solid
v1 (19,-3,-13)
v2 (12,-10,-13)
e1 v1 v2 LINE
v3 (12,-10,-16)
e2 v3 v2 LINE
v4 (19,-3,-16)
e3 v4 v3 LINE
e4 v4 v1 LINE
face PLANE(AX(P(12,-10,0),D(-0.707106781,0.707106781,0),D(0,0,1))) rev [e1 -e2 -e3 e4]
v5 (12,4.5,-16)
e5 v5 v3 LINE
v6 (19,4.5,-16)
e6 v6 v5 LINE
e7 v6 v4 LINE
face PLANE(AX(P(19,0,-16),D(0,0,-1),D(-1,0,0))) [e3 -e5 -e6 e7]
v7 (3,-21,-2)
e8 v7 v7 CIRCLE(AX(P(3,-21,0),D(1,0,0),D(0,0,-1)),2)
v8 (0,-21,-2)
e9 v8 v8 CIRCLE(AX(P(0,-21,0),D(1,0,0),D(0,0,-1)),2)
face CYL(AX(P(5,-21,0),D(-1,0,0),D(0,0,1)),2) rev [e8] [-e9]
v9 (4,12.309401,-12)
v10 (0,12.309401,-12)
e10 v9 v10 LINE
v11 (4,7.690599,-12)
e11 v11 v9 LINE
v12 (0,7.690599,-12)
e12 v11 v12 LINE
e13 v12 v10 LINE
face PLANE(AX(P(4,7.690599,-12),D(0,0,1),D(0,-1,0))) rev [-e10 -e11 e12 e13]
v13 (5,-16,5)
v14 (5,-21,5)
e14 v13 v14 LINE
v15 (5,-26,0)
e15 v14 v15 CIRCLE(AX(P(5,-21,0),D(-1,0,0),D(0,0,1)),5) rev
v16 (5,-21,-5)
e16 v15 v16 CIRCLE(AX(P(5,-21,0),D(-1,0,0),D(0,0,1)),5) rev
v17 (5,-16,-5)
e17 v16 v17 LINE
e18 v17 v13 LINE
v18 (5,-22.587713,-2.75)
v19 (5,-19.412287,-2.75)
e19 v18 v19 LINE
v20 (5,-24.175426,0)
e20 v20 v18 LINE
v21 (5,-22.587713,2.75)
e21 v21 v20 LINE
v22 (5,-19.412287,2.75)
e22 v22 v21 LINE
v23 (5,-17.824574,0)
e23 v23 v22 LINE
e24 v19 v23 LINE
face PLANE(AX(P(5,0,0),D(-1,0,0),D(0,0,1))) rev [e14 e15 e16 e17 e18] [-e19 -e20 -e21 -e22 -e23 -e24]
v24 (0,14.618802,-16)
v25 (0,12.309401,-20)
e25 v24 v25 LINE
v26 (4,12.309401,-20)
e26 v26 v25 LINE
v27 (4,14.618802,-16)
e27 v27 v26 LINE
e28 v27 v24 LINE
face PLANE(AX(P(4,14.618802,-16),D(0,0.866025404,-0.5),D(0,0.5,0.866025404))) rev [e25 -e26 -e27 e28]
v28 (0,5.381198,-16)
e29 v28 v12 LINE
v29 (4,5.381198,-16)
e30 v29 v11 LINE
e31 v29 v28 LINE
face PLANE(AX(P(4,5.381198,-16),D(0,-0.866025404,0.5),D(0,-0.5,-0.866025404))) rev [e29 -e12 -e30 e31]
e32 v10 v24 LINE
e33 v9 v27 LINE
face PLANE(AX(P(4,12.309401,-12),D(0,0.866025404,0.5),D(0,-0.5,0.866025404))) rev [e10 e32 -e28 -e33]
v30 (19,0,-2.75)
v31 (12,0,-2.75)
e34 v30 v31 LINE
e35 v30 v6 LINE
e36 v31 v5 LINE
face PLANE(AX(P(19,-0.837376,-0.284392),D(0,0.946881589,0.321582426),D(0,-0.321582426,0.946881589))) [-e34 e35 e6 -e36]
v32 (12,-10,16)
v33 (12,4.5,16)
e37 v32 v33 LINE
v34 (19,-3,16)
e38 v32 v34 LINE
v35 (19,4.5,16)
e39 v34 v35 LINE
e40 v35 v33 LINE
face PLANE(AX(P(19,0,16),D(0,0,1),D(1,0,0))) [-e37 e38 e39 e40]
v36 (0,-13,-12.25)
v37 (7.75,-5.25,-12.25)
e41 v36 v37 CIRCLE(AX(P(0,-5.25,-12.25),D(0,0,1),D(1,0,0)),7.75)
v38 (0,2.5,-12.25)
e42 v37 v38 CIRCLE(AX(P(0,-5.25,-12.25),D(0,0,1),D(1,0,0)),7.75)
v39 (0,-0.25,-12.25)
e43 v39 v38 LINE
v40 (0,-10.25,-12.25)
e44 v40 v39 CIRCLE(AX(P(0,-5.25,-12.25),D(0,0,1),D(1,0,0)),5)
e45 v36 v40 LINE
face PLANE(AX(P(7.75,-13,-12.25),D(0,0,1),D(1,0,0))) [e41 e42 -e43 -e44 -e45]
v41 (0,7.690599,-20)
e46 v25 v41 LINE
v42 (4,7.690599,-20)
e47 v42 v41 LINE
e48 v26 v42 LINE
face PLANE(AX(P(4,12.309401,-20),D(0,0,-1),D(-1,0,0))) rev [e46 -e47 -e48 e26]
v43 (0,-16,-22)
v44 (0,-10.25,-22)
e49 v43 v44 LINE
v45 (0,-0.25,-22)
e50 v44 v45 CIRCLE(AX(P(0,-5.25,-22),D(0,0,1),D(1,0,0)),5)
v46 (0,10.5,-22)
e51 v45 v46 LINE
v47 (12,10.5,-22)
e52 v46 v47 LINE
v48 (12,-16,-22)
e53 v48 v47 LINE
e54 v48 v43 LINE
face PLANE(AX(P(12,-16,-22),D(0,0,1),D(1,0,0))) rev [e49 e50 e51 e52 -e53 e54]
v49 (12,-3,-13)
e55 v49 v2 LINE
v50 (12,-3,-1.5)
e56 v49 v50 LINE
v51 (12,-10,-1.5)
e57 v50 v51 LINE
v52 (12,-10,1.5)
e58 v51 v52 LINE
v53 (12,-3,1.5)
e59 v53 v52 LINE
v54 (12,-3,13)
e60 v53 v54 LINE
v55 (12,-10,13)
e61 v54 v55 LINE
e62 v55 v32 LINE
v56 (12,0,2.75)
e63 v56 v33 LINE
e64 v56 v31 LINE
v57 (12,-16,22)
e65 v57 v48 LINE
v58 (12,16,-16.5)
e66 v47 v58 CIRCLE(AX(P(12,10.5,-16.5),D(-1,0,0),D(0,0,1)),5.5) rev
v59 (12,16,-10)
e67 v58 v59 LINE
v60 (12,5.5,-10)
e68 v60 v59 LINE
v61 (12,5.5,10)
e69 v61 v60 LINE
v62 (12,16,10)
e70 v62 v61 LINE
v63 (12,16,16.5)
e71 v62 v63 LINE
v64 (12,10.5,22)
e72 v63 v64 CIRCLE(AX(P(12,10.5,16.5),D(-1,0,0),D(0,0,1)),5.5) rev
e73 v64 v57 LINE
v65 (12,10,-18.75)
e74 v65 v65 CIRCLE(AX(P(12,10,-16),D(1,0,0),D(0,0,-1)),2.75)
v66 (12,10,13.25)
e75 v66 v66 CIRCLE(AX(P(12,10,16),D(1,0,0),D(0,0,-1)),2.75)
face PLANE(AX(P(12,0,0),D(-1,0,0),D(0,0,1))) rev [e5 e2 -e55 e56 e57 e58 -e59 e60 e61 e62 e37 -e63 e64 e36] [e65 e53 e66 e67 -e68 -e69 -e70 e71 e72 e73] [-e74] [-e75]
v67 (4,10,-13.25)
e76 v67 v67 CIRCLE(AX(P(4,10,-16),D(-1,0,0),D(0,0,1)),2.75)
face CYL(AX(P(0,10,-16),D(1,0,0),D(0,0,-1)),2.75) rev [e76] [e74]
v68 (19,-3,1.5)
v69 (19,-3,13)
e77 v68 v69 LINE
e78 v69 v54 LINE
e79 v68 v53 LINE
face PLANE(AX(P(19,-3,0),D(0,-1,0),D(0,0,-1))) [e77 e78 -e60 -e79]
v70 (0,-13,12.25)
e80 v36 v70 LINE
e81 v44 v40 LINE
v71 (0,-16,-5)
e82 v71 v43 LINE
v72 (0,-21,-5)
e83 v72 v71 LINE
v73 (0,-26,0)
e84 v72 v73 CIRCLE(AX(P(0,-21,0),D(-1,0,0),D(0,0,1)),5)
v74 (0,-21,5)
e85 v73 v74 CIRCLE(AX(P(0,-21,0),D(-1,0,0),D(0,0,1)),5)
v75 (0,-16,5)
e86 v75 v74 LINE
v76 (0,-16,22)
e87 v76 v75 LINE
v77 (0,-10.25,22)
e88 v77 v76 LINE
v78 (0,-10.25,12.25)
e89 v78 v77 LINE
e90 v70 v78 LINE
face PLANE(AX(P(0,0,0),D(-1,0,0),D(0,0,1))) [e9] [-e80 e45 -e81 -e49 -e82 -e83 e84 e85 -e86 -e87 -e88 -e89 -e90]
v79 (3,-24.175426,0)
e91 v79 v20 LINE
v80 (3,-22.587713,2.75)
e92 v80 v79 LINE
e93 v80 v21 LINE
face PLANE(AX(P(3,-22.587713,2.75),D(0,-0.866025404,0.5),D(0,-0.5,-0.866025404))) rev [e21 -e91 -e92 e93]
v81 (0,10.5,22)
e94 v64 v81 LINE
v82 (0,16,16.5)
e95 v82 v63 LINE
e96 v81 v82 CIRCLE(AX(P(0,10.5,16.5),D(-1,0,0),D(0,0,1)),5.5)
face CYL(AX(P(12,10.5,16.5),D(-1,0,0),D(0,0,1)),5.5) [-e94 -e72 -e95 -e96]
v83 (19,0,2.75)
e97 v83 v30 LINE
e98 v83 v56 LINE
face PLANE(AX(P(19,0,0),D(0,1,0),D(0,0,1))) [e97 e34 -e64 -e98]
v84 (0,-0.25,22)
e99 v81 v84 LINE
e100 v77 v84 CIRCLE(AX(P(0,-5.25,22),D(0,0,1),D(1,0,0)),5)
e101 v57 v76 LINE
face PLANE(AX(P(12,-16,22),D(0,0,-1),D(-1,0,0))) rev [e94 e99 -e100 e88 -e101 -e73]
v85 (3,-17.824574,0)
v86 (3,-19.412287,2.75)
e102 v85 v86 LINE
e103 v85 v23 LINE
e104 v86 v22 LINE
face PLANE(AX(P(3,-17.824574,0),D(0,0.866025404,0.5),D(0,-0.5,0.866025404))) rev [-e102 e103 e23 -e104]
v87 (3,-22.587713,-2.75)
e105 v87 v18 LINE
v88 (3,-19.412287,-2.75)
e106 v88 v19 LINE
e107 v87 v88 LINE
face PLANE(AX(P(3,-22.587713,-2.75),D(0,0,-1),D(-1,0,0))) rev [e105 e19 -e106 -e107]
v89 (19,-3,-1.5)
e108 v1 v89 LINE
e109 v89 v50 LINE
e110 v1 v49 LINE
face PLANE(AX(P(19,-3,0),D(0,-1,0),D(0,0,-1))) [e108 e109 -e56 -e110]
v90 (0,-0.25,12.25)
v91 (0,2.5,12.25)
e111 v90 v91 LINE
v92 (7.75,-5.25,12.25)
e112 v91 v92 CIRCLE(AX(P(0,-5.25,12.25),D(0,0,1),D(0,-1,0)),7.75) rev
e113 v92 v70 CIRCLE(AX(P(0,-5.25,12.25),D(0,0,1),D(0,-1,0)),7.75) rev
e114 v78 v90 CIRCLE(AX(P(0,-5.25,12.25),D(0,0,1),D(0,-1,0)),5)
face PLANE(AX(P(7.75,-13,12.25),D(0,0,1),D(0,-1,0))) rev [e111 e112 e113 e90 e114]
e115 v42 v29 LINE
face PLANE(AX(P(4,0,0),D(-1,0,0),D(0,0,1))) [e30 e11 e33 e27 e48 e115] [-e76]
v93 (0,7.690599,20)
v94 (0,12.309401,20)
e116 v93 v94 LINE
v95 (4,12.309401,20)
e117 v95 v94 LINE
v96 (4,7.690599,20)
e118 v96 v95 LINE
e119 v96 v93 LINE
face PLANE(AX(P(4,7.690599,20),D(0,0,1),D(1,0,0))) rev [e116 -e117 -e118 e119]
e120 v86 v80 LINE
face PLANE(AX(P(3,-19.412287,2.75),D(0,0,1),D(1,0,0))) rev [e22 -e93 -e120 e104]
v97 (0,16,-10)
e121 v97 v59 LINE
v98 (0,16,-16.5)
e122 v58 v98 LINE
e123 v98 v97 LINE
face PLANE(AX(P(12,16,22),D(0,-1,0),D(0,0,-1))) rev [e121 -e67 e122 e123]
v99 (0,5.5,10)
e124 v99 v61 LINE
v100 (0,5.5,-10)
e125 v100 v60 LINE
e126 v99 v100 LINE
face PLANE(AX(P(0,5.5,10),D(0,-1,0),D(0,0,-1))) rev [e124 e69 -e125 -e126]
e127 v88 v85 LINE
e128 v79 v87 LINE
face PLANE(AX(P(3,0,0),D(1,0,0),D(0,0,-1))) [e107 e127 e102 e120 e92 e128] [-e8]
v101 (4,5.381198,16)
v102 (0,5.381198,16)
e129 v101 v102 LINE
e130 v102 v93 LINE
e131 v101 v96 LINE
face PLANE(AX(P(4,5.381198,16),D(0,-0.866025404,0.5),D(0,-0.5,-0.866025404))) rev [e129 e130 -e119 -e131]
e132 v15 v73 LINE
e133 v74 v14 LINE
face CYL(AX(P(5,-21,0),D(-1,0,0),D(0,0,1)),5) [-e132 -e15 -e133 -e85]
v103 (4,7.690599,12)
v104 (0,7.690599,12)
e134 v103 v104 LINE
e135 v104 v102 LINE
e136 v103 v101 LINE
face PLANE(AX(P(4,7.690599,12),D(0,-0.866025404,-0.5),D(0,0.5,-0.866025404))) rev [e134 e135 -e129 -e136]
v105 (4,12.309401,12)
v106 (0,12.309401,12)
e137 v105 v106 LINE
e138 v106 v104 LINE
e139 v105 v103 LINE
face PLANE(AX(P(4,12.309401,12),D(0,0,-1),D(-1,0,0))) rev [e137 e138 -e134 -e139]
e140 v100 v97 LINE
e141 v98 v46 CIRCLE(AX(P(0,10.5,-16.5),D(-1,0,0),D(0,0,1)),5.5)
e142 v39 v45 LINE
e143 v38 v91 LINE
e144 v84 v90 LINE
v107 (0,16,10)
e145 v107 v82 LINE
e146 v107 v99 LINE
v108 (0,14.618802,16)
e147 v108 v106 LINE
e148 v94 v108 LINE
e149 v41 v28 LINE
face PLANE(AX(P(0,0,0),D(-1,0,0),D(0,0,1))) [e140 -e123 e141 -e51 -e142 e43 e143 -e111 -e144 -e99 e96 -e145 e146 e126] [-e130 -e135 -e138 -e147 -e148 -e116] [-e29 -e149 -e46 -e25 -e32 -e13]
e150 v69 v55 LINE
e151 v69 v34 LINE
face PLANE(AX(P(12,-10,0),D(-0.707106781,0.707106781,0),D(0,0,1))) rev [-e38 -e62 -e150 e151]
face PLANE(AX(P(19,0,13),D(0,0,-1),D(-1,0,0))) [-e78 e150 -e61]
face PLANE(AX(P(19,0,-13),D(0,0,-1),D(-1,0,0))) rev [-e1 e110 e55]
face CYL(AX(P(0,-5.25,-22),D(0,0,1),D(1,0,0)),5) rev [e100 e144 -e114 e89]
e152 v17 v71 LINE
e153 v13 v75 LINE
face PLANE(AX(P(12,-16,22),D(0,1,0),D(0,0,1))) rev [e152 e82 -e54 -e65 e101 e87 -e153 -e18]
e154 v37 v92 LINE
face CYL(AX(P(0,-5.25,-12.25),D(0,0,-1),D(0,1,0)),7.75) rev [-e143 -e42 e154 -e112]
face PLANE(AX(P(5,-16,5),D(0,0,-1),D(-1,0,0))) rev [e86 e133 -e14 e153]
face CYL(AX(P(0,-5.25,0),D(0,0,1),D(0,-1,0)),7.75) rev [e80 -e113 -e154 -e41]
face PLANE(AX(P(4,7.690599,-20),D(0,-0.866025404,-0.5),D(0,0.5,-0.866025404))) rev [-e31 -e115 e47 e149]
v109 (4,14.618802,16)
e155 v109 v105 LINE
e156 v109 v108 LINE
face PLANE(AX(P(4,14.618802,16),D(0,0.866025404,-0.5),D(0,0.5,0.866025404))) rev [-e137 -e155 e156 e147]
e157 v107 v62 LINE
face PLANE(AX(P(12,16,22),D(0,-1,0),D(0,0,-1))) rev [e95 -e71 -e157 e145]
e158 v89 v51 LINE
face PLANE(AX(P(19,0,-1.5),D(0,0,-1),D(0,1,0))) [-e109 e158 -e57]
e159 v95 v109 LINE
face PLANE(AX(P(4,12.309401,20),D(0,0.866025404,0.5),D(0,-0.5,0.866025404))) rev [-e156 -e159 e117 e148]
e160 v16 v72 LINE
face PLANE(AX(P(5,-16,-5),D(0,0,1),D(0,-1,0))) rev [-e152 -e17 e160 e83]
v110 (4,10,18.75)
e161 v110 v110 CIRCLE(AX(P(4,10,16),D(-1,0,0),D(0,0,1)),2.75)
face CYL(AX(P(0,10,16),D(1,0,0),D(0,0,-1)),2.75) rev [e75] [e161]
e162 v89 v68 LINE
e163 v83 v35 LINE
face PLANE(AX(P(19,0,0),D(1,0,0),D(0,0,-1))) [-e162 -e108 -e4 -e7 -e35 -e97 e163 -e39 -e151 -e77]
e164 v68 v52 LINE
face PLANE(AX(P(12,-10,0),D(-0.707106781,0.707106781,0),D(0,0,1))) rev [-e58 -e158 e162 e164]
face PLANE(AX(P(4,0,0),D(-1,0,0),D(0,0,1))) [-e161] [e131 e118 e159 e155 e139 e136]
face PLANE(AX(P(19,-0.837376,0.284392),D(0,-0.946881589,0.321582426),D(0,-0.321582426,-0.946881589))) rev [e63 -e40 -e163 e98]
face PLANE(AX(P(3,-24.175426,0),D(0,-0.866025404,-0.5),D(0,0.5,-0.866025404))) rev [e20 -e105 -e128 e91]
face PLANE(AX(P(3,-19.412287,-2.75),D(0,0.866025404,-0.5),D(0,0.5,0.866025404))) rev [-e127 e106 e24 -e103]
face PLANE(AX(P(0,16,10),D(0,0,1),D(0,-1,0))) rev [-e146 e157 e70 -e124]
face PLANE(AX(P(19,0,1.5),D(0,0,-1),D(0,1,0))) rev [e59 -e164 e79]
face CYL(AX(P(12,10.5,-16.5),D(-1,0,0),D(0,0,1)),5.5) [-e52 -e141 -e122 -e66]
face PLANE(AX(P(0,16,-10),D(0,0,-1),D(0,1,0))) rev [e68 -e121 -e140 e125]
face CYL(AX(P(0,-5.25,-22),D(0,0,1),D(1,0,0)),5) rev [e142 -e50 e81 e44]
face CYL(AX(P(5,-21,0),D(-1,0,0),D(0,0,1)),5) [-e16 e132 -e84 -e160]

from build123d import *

# Parameters (mm, degrees)
SKETCH1_W               = 44
SKETCH1_H               = 32
BOSS_EXTRUDE1_DEPTH     = 12
SKETCH2_W               = 24.5
SKETCH2_H               = 15.5
CUT_EXTRUDE1_DEPTH      = 7.75
FILLET1_R               = 7.75
CUT_EXTRUDE2_DEPTH      = 40.661851949
CUT_EXTRUDE2_DEPTH_BACK = 40.661851949
SKETCH4_R               = 2.75
SKETCH4_W               = 20
SKETCH4_H               = 10.5
CUT_EXTRUDE3_DEPTH      = 30.732137495
SKETCH5_W               = 5.5
SKETCH5_H               = 3
BOSS_EXTRUDE4_DEPTH     = 7
CHAMFER1_SIZE           = 7
SKETCH6_W               = 11.5
SKETCH6_H               = 7
CUT_EXTRUDE5_DEPTH      = 30.732137495
FILLET4_R               = 5.5
SKETCH7_W               = 10
SKETCH7_H               = 10
SKETCH7_R               = 2
BOSS_EXTRUDE5_DEPTH     = 5
CUT_EXTRUDE6_START      = -2
SKETCH8_R               = 2
CUT_EXTRUDE6_DEPTH      = 2
FILLET5_R               = 5
CUT_EXTRUDE7_START      = -4
SKETCH9_R               = 2.75
CUT_EXTRUDE7_DEPTH      = 4


with BuildPart() as part:
    # Sketch1 → Boss-Extrude1 (new body)
    with BuildSketch(Plane(origin=(0, 0, 0), x_dir=(0, 0, -1), z_dir=(1, 0, 0))):
        Rectangle(SKETCH1_W, SKETCH1_H)
    extrude(amount=BOSS_EXTRUDE1_DEPTH)

    # Sketch2 → Cut-Extrude1 (cut)
    with BuildSketch(Plane(origin=(0, 0, 0), x_dir=(0, 0, -1), z_dir=(1, 0, 0))):
        with Locations((0, -5.25)):
            Rectangle(SKETCH2_W, SKETCH2_H)
    extrude(amount=CUT_EXTRUDE1_DEPTH, mode=Mode.SUBTRACT)

    # Fillet1
    fillet1_edges = [part.edges().sort_by_distance(p)[0] for p in [
        (7.75, 2.5, 0),
        (7.75, -13, 0),
    ]]
    fillet(fillet1_edges, radius=FILLET1_R - 0.0001)  # a hair under: the kernel refuses the full size

    # Sketch3 → Cut-Extrude2 (cut, two sides: drawn at the far end of the back side and taken through both)
    with BuildSketch(Plane.XY.offset(-12.25).offset(-CUT_EXTRUDE2_DEPTH_BACK)):
        with BuildLine():
            ThreePointArc((0, -10.25), (3.535533906, -8.785533906), (5, -5.25))
            ThreePointArc((5, -5.25), (3.535533906, -1.714466094), (0, -0.25))
            Line((0, -0.25), (0, -10.25))
        make_face()
        with BuildLine():
            Line((0, -10.25), (0, -0.25))
            ThreePointArc((0, -0.25), (-5, -5.25), (0, -10.25))
        make_face()
    extrude(amount=CUT_EXTRUDE2_DEPTH + CUT_EXTRUDE2_DEPTH_BACK, mode=Mode.SUBTRACT)

    # Sketch4 → Cut-Extrude3 (cut, through all)
    with BuildSketch(Plane(origin=(12, 0, 0), x_dir=(0, 0, -1), z_dir=(1, 0, 0))):
        with Locations((-16, 10)):
            Circle(SKETCH4_R)
        with Locations((16, 10)):
            Circle(SKETCH4_R)
        with Locations((0, 10.75)):
            Rectangle(SKETCH4_W, SKETCH4_H)
    extrude(amount=-CUT_EXTRUDE3_DEPTH, mode=Mode.SUBTRACT)

    # Sketch5 → Boss-Extrude4 (add)
    with BuildSketch(Plane(origin=(12, 0, 0), x_dir=(0, 0, -1), z_dir=(1, 0, 0))):
        Polygon((-16, -3), (-16, 4.5), (-2.75, -3), align=None)
        Polygon((-2.75, -3), (-16, 4.5), (-2.75, 0), align=None)
        with Locations((0, -1.5)):
            Rectangle(SKETCH5_W, SKETCH5_H)
        Polygon((2.75, -3), (2.75, 0), (16, 4.5), align=None)
        Polygon((16, -3), (2.75, -3), (16, 4.5), align=None)
    extrude(amount=BOSS_EXTRUDE4_DEPTH)

    # Chamfer1
    chamfer1_edges = [part.edges().sort_by_distance(p)[0] for p in [
        (12, -3, 0),
    ]]
    chamfer(chamfer1_edges, length=CHAMFER1_SIZE - 0.0001)  # a hair under: the kernel refuses the full size

    # Sketch6 → Cut-Extrude5 (cut, through all)
    with BuildSketch(Plane(origin=(12, 0, 0), x_dir=(0, 0, -1), z_dir=(1, 0, 0))):
        with Locations((-7.25, -6.5)):
            Rectangle(SKETCH6_W, SKETCH6_H)
        with Locations((7.25, -6.5)):
            Rectangle(SKETCH6_W, SKETCH6_H)
    extrude(amount=CUT_EXTRUDE5_DEPTH, mode=Mode.SUBTRACT)

    # Fillet4
    fillet4_edges = [part.edges().sort_by_distance(p)[0] for p in [
        (6, 16, 22),
        (6, 16, -22),
    ]]
    fillet(fillet4_edges, radius=FILLET4_R)

    # Sketch7 → Boss-Extrude5 (add)
    with BuildSketch(Plane(origin=(0, 0, 0), x_dir=(0, 0, -1), z_dir=(1, 0, 0))):
        with Locations((0, -21)):
            Rectangle(SKETCH7_W, SKETCH7_H)
        with Locations((0, -21)):
            Circle(SKETCH7_R, mode=Mode.SUBTRACT)
    extrude(amount=BOSS_EXTRUDE5_DEPTH)

    # Sketch8 → Cut-Extrude6 (cut)
    with BuildSketch(Plane(origin=(5, 0, 0), x_dir=(0, 0, -1), z_dir=(1, 0, 0)).offset(CUT_EXTRUDE6_START)):
        Polygon((0, -24.175426481), (2.75, -22.58771324), (2.75, -19.41228676), (0, -17.824573519), (-2.75, -19.41228676), (-2.75, -22.58771324), align=None)
        with Locations((0, -21)):
            Circle(SKETCH8_R, mode=Mode.SUBTRACT)
    extrude(amount=CUT_EXTRUDE6_DEPTH, mode=Mode.SUBTRACT)

    # Fillet5
    fillet5_edges = [part.edges().sort_by_distance(p)[0] for p in [
        (2.5, -26, -5),
        (2.5, -26, 5),
    ]]
    fillet(fillet5_edges, radius=FILLET5_R - 0.0001)  # a hair under: the kernel refuses the full size

    # Sketch9 → Cut-Extrude7 (cut)
    # profile 1 of 2: a face of its own
    with BuildSketch(Plane.ZY.offset(CUT_EXTRUDE7_START)):
        Polygon((-16, 5.381197846), (-12, 7.690598923), (-12, 12.309401077), (-16, 14.618802154), (-20, 12.309401077), (-20, 7.690598923), align=None)
        with Locations(Location((-16, 10, 0), (0, 0, 180))):
            Circle(SKETCH9_R, mode=Mode.SUBTRACT)
    # profile 2 of 2: a face of its own
    with BuildSketch(Plane.ZY.offset(CUT_EXTRUDE7_START)):
        Polygon((16, 5.381197846), (20, 7.690598923), (20, 12.309401077), (16, 14.618802154), (12, 12.309401077), (12, 7.690598923), align=None)
        with Locations(Location((16, 10, 0), (0, 0, 180))):
            Circle(SKETCH9_R, mode=Mode.SUBTRACT)
    extrude(amount=CUT_EXTRUDE7_DEPTH, mode=Mode.SUBTRACT)


solid = part.part
